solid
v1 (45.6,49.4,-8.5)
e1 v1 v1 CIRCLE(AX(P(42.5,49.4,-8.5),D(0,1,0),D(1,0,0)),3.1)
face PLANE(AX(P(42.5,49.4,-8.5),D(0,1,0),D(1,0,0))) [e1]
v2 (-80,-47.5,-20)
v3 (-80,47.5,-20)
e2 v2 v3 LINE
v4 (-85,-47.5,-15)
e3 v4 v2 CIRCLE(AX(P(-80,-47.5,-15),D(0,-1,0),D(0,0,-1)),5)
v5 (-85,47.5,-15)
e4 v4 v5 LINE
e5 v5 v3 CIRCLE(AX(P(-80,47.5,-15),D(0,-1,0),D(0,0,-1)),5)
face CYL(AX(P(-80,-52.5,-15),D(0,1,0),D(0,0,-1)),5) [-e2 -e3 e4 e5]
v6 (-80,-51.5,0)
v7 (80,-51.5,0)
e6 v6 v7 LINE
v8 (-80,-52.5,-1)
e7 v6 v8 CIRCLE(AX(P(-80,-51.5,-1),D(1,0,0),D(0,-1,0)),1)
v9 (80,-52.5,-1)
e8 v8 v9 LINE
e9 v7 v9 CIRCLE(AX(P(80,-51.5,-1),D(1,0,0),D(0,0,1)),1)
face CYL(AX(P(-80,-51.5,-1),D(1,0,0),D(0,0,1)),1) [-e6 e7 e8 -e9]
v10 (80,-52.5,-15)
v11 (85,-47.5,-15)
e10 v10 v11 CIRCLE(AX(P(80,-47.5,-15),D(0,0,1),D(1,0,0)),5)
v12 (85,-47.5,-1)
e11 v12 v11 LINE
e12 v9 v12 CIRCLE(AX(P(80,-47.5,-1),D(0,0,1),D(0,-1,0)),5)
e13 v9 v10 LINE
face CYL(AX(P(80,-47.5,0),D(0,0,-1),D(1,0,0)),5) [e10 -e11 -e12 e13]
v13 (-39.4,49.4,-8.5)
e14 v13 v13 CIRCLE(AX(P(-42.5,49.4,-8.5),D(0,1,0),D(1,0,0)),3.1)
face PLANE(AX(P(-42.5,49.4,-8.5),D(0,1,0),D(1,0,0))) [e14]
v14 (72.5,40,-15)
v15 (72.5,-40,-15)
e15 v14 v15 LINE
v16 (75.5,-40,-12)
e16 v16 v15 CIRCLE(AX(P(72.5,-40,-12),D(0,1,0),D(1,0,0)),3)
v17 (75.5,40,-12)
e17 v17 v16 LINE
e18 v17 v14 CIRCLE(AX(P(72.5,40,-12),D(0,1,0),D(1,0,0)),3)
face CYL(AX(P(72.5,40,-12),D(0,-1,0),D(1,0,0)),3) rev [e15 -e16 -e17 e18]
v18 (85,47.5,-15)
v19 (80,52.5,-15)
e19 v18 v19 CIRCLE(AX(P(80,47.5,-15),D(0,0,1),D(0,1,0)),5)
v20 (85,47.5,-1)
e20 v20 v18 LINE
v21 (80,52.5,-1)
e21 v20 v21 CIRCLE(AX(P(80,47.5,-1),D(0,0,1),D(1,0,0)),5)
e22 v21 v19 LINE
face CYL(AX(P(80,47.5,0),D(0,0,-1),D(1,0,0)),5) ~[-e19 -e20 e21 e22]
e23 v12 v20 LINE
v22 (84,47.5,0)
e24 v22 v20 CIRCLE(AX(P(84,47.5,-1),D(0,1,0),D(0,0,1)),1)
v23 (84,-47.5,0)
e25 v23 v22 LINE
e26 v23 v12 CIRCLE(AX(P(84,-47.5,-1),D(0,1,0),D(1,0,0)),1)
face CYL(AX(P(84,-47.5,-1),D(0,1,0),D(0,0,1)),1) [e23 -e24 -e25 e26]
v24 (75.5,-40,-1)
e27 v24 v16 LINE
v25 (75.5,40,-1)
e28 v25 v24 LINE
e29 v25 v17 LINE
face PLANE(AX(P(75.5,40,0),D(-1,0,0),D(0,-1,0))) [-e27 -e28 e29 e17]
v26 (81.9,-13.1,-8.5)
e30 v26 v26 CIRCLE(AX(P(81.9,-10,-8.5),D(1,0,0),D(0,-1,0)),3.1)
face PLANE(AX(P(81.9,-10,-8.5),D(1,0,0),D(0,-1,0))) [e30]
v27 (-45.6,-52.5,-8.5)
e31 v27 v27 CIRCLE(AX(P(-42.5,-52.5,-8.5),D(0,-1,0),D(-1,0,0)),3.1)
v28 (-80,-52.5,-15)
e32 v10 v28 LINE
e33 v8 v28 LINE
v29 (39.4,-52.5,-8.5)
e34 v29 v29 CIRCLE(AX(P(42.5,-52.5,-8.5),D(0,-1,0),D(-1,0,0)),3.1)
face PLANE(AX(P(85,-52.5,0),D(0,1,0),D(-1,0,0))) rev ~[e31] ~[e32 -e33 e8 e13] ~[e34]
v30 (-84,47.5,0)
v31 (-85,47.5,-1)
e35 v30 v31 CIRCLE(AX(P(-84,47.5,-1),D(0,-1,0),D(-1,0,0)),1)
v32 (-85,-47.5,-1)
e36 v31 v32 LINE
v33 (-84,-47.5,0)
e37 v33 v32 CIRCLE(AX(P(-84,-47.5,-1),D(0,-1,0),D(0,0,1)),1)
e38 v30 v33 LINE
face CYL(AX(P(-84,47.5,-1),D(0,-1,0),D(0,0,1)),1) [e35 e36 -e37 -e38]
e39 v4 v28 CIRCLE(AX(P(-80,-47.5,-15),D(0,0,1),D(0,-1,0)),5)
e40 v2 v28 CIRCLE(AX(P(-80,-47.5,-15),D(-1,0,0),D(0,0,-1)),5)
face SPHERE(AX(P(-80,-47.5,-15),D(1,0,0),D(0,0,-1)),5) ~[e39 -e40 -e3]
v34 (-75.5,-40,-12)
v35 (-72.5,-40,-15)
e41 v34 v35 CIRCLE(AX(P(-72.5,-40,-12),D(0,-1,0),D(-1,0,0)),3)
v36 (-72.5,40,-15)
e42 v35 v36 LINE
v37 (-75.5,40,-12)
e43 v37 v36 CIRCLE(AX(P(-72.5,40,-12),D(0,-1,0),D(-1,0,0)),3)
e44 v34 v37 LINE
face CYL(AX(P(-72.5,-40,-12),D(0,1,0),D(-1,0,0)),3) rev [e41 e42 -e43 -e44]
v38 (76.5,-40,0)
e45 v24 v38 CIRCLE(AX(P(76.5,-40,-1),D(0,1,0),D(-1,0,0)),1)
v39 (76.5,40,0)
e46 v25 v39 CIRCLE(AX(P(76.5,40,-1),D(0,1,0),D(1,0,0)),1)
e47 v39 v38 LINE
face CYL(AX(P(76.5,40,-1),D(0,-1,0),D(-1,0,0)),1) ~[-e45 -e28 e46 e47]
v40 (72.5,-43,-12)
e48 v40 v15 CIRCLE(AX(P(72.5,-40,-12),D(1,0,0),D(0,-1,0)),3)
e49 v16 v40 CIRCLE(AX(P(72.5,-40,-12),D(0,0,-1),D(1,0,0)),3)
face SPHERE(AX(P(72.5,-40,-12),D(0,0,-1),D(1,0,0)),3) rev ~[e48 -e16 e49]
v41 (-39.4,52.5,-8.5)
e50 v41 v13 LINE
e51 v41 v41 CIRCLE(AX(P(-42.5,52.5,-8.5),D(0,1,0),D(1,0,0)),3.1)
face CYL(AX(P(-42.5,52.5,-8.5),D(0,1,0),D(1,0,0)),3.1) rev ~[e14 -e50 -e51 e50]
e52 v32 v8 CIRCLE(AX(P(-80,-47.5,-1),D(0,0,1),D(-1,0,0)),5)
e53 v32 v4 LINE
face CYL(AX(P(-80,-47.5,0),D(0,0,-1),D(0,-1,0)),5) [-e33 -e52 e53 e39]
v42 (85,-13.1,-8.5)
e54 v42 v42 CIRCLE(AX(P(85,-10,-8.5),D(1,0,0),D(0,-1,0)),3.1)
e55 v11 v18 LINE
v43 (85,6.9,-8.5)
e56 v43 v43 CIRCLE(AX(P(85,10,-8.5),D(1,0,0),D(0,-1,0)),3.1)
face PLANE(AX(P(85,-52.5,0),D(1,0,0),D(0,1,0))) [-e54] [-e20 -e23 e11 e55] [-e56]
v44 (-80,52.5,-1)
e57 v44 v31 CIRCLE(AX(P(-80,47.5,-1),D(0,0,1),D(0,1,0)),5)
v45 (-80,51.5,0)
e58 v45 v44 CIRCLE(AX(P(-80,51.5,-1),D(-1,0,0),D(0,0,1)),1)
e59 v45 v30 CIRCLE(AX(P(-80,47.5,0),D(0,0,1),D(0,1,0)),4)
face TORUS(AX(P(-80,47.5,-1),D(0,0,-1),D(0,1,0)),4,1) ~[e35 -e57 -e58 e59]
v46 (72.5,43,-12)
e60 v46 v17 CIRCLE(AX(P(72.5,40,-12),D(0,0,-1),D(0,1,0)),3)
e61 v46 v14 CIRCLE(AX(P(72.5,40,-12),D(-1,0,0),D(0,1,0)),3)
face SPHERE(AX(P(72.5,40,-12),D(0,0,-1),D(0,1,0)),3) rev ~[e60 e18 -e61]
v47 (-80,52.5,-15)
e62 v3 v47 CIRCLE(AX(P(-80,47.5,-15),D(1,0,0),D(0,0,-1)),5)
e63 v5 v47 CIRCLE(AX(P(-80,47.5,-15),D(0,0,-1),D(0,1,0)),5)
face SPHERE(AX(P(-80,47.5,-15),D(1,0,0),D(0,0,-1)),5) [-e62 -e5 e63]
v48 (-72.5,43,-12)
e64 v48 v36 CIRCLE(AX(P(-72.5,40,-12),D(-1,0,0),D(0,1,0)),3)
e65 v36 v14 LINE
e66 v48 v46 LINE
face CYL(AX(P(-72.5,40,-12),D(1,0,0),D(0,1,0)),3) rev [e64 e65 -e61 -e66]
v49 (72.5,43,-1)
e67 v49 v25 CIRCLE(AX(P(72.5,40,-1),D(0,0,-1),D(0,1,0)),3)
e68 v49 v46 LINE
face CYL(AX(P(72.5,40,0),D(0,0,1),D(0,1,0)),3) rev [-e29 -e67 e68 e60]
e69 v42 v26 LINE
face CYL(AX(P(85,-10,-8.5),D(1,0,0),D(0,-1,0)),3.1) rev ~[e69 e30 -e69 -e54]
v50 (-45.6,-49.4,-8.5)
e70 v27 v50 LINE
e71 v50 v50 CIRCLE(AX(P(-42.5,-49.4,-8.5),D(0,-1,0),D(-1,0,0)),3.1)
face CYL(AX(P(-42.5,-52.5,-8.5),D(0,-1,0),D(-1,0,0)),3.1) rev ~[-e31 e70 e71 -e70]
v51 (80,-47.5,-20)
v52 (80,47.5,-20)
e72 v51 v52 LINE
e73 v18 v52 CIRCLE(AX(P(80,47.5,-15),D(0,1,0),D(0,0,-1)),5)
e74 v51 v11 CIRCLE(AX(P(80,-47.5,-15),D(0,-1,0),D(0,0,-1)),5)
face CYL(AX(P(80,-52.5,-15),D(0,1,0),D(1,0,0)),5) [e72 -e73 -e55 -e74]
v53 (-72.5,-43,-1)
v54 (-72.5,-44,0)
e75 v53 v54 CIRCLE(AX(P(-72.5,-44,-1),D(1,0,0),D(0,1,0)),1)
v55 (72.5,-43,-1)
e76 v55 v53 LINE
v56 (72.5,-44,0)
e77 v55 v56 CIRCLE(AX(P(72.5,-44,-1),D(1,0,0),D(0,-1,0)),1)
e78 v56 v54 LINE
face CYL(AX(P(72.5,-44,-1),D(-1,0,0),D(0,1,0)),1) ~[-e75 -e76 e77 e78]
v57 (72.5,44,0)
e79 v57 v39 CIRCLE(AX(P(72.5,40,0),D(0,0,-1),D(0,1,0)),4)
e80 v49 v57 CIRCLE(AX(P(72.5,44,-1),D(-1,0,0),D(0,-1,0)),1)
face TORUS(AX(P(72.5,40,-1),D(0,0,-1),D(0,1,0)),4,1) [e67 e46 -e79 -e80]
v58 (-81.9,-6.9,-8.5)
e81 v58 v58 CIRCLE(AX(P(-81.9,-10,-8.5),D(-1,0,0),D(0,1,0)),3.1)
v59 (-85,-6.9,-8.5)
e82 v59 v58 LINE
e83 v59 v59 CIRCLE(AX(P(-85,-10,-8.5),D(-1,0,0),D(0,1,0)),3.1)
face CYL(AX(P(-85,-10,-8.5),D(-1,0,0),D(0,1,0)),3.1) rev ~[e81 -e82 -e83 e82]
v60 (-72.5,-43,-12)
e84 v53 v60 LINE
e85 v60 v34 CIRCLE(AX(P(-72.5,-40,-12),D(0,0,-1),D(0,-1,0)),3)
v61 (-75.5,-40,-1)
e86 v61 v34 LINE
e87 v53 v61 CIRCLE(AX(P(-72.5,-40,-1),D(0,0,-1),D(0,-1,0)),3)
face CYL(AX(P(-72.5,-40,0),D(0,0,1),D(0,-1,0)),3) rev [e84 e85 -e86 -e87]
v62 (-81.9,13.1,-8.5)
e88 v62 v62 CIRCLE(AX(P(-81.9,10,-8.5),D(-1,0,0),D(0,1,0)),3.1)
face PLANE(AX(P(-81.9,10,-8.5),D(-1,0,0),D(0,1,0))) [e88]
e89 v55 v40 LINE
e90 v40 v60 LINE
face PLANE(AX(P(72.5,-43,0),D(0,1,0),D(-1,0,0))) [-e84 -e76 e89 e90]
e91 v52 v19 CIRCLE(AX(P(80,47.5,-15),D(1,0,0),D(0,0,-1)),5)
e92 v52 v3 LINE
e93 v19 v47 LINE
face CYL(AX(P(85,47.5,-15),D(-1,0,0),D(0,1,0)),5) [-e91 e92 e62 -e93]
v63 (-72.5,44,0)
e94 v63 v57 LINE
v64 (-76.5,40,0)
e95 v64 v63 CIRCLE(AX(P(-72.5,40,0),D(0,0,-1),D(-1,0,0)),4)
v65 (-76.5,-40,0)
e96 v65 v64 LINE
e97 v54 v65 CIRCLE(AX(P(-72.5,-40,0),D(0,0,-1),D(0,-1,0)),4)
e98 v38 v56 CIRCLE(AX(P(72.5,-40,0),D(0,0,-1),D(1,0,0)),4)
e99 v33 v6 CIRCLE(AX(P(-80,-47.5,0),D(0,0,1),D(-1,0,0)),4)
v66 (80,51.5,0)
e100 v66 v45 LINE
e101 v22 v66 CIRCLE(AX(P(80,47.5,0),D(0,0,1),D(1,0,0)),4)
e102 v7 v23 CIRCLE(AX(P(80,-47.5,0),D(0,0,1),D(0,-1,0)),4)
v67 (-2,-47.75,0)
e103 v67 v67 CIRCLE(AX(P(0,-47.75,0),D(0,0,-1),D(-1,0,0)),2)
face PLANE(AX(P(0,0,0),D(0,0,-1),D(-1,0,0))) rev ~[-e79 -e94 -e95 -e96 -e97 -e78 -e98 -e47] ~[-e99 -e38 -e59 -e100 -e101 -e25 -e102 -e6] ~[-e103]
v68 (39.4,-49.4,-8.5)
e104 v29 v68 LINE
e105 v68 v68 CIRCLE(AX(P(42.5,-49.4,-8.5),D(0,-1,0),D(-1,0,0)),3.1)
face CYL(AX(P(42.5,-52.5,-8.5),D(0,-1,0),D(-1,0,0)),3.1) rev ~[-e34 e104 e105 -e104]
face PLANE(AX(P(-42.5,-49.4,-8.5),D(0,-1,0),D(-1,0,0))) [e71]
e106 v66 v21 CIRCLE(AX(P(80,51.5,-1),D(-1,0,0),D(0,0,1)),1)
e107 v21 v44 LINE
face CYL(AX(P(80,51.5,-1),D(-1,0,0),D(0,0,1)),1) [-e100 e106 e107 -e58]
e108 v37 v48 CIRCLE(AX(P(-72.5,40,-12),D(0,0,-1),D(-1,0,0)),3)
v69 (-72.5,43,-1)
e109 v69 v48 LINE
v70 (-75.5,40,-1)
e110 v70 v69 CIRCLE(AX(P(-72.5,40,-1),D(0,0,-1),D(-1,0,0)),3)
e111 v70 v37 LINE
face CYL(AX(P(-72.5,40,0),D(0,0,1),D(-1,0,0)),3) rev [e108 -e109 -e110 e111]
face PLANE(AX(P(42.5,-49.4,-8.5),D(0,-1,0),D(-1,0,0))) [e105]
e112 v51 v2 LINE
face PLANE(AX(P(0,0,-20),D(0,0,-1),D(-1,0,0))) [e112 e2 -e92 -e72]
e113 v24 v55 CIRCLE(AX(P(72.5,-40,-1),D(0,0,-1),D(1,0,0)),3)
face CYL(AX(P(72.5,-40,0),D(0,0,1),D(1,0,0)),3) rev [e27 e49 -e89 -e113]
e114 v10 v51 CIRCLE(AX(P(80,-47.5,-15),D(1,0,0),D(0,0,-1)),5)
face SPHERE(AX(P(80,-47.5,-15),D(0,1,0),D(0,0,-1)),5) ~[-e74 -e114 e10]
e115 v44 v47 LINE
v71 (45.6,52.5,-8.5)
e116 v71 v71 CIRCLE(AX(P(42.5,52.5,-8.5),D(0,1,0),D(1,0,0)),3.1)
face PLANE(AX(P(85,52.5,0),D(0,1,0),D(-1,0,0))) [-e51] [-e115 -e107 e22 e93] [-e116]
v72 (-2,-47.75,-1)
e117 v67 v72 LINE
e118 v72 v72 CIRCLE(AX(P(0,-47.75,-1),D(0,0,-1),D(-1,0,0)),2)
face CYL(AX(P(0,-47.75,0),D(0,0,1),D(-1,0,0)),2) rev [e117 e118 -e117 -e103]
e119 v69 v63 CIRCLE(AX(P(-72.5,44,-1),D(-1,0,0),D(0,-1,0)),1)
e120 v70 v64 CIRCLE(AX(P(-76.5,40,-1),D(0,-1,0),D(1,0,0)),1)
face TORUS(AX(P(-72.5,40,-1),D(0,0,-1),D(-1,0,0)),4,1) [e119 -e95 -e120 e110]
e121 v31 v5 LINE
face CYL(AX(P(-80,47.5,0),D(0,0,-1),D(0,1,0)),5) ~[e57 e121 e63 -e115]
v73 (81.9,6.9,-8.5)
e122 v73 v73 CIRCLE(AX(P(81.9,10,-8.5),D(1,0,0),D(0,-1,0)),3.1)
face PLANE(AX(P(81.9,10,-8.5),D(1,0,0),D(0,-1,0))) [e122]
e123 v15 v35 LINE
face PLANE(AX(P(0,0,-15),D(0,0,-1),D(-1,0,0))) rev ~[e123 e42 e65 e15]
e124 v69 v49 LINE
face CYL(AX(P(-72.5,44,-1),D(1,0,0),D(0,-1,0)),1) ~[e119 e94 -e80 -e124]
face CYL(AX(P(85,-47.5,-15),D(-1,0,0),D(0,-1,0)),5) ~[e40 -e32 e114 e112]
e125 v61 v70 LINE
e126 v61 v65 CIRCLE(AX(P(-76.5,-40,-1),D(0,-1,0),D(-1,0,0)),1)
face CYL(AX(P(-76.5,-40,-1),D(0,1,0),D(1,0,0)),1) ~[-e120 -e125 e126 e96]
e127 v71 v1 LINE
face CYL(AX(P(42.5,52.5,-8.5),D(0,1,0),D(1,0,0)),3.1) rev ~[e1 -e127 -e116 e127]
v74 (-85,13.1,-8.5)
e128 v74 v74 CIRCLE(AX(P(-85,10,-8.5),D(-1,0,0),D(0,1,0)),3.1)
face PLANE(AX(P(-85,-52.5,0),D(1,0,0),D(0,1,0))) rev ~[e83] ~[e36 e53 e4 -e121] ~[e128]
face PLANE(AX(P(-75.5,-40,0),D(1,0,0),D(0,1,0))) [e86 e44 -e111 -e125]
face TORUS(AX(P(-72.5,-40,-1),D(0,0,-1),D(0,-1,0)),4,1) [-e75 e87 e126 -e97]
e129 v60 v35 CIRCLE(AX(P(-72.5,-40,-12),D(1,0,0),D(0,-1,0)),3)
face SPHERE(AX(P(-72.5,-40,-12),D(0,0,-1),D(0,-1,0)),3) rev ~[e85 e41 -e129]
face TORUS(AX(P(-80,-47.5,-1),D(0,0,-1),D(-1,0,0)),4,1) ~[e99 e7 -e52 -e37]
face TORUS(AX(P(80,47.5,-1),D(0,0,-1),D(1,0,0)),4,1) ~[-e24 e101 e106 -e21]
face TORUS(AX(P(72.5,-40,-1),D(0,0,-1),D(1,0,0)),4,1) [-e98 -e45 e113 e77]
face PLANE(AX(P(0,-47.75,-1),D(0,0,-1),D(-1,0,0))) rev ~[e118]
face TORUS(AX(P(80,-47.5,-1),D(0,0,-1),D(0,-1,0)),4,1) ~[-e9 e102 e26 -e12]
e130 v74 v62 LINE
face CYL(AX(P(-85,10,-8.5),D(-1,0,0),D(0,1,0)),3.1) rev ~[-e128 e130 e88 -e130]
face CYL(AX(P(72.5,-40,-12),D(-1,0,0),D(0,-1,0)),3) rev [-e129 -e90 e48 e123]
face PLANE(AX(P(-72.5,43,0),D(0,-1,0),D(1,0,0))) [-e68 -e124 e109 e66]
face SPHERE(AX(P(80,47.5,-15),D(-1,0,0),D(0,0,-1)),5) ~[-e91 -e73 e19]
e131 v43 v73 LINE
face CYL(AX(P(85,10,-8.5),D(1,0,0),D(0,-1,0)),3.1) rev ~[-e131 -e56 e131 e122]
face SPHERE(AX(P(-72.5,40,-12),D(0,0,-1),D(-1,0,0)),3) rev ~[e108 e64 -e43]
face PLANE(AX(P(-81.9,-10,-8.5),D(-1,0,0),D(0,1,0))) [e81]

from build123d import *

# Parameters (mm, degrees)
F0_W      = 170
F0_H      = 105
F0_R      = 2
F3_DEPTH  = 20
F4_DEPTH  = 15
F5_R      = 5
F6_R      = 3
F7_R      = 1
F8_R      = 3.1
F9_DEPTH  = 3.1
F10_R     = 3.1
F11_DEPTH = 3.1
F12_R     = 3.1
F13_DEPTH = 3.1
F14_R     = 3.1
F15_DEPTH = 3.1
F16_DEPTH = 1
F17_ANGLE = 180


# Not quite as in the source:
# - a feature names something its author has since deleted; it is built from what else it names


with BuildPart() as f3:
    # F0 (on Top) → F3 (new body)
    with BuildSketch(Plane.XY):
        Rectangle(F0_W, F0_H)
        with Locations((0, -47.75)):
            Circle(F0_R, mode=Mode.SUBTRACT)
        with BuildLine():
            ThreePointArc((-75.5, 40), (-74.6213203436, 42.1213203436), (-72.5, 43))
            Line((-72.5, 43), (72.5, 43))
            ThreePointArc((72.5, 43), (74.6213203436, 42.1213203436), (75.5, 40))
            Line((75.5, 40), (75.5, -40))
            ThreePointArc((75.5, -40), (74.6213203436, -42.1213203436), (72.5, -43))
            Line((72.5, -43), (-72.5, -43))
            ThreePointArc((-72.5, -43), (-74.6213203436, -42.1213203436), (-75.5, -40))
            Line((-75.5, -40), (-75.5, 40))
        make_face(mode=Mode.SUBTRACT)
        with BuildLine():
            Line((72.5, 43), (-72.5, 43))
            ThreePointArc((-72.5, 43), (-74.6213203436, 42.1213203436), (-75.5, 40))
            Line((-75.5, 40), (-75.5, -40))
            ThreePointArc((-75.5, -40), (-74.6213203436, -42.1213203436), (-72.5, -43))
            Line((-72.5, -43), (72.5, -43))
            ThreePointArc((72.5, -43), (74.6213203436, -42.1213203436), (75.5, -40))
            Line((75.5, -40), (75.5, 40))
            ThreePointArc((75.5, 40), (74.6213203436, 42.1213203436), (72.5, 43))
        make_face()
        with Locations((0, -47.75)):
            Circle(F0_R)
    extrude(amount=F3_DEPTH)

    # F0 (on Top) → F4 (cut)
    with BuildSketch(Plane.XY):
        with BuildLine():
            Line((72.5, 43), (-72.5, 43))
            ThreePointArc((-72.5, 43), (-74.6213203436, 42.1213203436), (-75.5, 40))
            Line((-75.5, 40), (-75.5, -40))
            ThreePointArc((-75.5, -40), (-74.6213203436, -42.1213203436), (-72.5, -43))
            Line((-72.5, -43), (72.5, -43))
            ThreePointArc((72.5, -43), (74.6213203436, -42.1213203436), (75.5, -40))
            Line((75.5, -40), (75.5, 40))
            ThreePointArc((75.5, 40), (74.6213203436, 42.1213203436), (72.5, 43))
        make_face()
    extrude(amount=F4_DEPTH, mode=Mode.SUBTRACT)

    # F5
    f5_edges = [f3.edges().sort_by_distance(p)[0] for p in [
        (0, 52.5, 20),
        (-85, 0, 20),
        (0, -52.5, 20),
        (85, 0, 20),
        (85, 52.5, 10),
        (-85, 52.5, 10),
        (-85, -52.5, 10),
        (85, -52.5, 10),
    ]]
    fillet(f5_edges, radius=F5_R)

    # F6
    f6_edges = [f3.edges().sort_by_distance(p)[0] for p in [
        (0, 43, 15),
        (-74.62132, 42.12132, 15),
        (-75.5, 0, 15),
        (-74.62132, -42.12132, 15),
        (0, -43, 15),
        (74.62132, -42.12132, 15),
        (75.5, 0, 15),
        (74.62132, 42.12132, 15),
    ]]
    fillet(f6_edges, radius=F6_R)

    # F7
    f7_edges = [f3.edges().sort_by_distance(p)[0] for p in [
        (0, 52.5, 0),
        (83.535534, 51.035534, 0),
        (-83.535534, 51.035534, 0),
        (85, 0, 0),
        (-85, 0, 0),
        (83.535534, -51.035534, 0),
        (-83.535534, -51.035534, 0),
        (0, -52.5, 0),
        (0, 43, 0),
        (-74.62132, 42.12132, 0),
        (-75.5, 0, 0),
        (-74.62132, -42.12132, 0),
        (0, -43, 0),
        (74.62132, -42.12132, 0),
        (75.5, 0, 0),
        (74.62132, 42.12132, 0),
    ]]
    fillet(f7_edges, radius=F7_R)

    # F8 (on face) → F9 (cut)
    with BuildSketch(Plane.XZ.offset(52.5)):
        with Locations((42.5, 8.5)):
            Circle(F8_R)
        with Locations((-42.5, 8.5)):
            Circle(F8_R)
    extrude(amount=-F9_DEPTH, mode=Mode.SUBTRACT)

    # F10 (on face) → F11 (cut)
    with BuildSketch(Plane(origin=(0, 52.5, 0), x_dir=(-1, 0, 0), z_dir=(0, 1, 0))):
        with Locations((42.5, 8.5)):
            Circle(F10_R)
        with Locations((-42.5, 8.5)):
            Circle(F10_R)
    extrude(amount=-F11_DEPTH, mode=Mode.SUBTRACT)

    # F12 (on face) → F13 (cut)
    with BuildSketch(Plane(origin=(-85, 0, 0), x_dir=(0, -1, 0), z_dir=(-1, 0, 0))):
        with Locations((10, 8.5)):
            Circle(F12_R)
        with Locations((-10, 8.5)):
            Circle(F12_R)
    extrude(amount=-F13_DEPTH, mode=Mode.SUBTRACT)

    # F14 (on face) → F15 (cut)
    with BuildSketch(Plane.YZ.offset(85)):
        with Locations((10, 8.5)):
            Circle(F14_R)
        with Locations((-10, 8.5)):
            Circle(F14_R)
    extrude(amount=-F15_DEPTH, mode=Mode.SUBTRACT)

    # F0 (on Top) → F16 (cut)
    with BuildSketch(Plane.XY):
        with Locations((0, -47.75)):
            Circle(F0_R)
    extrude(amount=F16_DEPTH, mode=Mode.SUBTRACT)


with BuildPart() as f3_1:
    # F17: moved
    add(f3.part.rotate(Axis((0, 0, 0), (0, 1, 0)), F17_ANGLE))


solid = f3_1.part
